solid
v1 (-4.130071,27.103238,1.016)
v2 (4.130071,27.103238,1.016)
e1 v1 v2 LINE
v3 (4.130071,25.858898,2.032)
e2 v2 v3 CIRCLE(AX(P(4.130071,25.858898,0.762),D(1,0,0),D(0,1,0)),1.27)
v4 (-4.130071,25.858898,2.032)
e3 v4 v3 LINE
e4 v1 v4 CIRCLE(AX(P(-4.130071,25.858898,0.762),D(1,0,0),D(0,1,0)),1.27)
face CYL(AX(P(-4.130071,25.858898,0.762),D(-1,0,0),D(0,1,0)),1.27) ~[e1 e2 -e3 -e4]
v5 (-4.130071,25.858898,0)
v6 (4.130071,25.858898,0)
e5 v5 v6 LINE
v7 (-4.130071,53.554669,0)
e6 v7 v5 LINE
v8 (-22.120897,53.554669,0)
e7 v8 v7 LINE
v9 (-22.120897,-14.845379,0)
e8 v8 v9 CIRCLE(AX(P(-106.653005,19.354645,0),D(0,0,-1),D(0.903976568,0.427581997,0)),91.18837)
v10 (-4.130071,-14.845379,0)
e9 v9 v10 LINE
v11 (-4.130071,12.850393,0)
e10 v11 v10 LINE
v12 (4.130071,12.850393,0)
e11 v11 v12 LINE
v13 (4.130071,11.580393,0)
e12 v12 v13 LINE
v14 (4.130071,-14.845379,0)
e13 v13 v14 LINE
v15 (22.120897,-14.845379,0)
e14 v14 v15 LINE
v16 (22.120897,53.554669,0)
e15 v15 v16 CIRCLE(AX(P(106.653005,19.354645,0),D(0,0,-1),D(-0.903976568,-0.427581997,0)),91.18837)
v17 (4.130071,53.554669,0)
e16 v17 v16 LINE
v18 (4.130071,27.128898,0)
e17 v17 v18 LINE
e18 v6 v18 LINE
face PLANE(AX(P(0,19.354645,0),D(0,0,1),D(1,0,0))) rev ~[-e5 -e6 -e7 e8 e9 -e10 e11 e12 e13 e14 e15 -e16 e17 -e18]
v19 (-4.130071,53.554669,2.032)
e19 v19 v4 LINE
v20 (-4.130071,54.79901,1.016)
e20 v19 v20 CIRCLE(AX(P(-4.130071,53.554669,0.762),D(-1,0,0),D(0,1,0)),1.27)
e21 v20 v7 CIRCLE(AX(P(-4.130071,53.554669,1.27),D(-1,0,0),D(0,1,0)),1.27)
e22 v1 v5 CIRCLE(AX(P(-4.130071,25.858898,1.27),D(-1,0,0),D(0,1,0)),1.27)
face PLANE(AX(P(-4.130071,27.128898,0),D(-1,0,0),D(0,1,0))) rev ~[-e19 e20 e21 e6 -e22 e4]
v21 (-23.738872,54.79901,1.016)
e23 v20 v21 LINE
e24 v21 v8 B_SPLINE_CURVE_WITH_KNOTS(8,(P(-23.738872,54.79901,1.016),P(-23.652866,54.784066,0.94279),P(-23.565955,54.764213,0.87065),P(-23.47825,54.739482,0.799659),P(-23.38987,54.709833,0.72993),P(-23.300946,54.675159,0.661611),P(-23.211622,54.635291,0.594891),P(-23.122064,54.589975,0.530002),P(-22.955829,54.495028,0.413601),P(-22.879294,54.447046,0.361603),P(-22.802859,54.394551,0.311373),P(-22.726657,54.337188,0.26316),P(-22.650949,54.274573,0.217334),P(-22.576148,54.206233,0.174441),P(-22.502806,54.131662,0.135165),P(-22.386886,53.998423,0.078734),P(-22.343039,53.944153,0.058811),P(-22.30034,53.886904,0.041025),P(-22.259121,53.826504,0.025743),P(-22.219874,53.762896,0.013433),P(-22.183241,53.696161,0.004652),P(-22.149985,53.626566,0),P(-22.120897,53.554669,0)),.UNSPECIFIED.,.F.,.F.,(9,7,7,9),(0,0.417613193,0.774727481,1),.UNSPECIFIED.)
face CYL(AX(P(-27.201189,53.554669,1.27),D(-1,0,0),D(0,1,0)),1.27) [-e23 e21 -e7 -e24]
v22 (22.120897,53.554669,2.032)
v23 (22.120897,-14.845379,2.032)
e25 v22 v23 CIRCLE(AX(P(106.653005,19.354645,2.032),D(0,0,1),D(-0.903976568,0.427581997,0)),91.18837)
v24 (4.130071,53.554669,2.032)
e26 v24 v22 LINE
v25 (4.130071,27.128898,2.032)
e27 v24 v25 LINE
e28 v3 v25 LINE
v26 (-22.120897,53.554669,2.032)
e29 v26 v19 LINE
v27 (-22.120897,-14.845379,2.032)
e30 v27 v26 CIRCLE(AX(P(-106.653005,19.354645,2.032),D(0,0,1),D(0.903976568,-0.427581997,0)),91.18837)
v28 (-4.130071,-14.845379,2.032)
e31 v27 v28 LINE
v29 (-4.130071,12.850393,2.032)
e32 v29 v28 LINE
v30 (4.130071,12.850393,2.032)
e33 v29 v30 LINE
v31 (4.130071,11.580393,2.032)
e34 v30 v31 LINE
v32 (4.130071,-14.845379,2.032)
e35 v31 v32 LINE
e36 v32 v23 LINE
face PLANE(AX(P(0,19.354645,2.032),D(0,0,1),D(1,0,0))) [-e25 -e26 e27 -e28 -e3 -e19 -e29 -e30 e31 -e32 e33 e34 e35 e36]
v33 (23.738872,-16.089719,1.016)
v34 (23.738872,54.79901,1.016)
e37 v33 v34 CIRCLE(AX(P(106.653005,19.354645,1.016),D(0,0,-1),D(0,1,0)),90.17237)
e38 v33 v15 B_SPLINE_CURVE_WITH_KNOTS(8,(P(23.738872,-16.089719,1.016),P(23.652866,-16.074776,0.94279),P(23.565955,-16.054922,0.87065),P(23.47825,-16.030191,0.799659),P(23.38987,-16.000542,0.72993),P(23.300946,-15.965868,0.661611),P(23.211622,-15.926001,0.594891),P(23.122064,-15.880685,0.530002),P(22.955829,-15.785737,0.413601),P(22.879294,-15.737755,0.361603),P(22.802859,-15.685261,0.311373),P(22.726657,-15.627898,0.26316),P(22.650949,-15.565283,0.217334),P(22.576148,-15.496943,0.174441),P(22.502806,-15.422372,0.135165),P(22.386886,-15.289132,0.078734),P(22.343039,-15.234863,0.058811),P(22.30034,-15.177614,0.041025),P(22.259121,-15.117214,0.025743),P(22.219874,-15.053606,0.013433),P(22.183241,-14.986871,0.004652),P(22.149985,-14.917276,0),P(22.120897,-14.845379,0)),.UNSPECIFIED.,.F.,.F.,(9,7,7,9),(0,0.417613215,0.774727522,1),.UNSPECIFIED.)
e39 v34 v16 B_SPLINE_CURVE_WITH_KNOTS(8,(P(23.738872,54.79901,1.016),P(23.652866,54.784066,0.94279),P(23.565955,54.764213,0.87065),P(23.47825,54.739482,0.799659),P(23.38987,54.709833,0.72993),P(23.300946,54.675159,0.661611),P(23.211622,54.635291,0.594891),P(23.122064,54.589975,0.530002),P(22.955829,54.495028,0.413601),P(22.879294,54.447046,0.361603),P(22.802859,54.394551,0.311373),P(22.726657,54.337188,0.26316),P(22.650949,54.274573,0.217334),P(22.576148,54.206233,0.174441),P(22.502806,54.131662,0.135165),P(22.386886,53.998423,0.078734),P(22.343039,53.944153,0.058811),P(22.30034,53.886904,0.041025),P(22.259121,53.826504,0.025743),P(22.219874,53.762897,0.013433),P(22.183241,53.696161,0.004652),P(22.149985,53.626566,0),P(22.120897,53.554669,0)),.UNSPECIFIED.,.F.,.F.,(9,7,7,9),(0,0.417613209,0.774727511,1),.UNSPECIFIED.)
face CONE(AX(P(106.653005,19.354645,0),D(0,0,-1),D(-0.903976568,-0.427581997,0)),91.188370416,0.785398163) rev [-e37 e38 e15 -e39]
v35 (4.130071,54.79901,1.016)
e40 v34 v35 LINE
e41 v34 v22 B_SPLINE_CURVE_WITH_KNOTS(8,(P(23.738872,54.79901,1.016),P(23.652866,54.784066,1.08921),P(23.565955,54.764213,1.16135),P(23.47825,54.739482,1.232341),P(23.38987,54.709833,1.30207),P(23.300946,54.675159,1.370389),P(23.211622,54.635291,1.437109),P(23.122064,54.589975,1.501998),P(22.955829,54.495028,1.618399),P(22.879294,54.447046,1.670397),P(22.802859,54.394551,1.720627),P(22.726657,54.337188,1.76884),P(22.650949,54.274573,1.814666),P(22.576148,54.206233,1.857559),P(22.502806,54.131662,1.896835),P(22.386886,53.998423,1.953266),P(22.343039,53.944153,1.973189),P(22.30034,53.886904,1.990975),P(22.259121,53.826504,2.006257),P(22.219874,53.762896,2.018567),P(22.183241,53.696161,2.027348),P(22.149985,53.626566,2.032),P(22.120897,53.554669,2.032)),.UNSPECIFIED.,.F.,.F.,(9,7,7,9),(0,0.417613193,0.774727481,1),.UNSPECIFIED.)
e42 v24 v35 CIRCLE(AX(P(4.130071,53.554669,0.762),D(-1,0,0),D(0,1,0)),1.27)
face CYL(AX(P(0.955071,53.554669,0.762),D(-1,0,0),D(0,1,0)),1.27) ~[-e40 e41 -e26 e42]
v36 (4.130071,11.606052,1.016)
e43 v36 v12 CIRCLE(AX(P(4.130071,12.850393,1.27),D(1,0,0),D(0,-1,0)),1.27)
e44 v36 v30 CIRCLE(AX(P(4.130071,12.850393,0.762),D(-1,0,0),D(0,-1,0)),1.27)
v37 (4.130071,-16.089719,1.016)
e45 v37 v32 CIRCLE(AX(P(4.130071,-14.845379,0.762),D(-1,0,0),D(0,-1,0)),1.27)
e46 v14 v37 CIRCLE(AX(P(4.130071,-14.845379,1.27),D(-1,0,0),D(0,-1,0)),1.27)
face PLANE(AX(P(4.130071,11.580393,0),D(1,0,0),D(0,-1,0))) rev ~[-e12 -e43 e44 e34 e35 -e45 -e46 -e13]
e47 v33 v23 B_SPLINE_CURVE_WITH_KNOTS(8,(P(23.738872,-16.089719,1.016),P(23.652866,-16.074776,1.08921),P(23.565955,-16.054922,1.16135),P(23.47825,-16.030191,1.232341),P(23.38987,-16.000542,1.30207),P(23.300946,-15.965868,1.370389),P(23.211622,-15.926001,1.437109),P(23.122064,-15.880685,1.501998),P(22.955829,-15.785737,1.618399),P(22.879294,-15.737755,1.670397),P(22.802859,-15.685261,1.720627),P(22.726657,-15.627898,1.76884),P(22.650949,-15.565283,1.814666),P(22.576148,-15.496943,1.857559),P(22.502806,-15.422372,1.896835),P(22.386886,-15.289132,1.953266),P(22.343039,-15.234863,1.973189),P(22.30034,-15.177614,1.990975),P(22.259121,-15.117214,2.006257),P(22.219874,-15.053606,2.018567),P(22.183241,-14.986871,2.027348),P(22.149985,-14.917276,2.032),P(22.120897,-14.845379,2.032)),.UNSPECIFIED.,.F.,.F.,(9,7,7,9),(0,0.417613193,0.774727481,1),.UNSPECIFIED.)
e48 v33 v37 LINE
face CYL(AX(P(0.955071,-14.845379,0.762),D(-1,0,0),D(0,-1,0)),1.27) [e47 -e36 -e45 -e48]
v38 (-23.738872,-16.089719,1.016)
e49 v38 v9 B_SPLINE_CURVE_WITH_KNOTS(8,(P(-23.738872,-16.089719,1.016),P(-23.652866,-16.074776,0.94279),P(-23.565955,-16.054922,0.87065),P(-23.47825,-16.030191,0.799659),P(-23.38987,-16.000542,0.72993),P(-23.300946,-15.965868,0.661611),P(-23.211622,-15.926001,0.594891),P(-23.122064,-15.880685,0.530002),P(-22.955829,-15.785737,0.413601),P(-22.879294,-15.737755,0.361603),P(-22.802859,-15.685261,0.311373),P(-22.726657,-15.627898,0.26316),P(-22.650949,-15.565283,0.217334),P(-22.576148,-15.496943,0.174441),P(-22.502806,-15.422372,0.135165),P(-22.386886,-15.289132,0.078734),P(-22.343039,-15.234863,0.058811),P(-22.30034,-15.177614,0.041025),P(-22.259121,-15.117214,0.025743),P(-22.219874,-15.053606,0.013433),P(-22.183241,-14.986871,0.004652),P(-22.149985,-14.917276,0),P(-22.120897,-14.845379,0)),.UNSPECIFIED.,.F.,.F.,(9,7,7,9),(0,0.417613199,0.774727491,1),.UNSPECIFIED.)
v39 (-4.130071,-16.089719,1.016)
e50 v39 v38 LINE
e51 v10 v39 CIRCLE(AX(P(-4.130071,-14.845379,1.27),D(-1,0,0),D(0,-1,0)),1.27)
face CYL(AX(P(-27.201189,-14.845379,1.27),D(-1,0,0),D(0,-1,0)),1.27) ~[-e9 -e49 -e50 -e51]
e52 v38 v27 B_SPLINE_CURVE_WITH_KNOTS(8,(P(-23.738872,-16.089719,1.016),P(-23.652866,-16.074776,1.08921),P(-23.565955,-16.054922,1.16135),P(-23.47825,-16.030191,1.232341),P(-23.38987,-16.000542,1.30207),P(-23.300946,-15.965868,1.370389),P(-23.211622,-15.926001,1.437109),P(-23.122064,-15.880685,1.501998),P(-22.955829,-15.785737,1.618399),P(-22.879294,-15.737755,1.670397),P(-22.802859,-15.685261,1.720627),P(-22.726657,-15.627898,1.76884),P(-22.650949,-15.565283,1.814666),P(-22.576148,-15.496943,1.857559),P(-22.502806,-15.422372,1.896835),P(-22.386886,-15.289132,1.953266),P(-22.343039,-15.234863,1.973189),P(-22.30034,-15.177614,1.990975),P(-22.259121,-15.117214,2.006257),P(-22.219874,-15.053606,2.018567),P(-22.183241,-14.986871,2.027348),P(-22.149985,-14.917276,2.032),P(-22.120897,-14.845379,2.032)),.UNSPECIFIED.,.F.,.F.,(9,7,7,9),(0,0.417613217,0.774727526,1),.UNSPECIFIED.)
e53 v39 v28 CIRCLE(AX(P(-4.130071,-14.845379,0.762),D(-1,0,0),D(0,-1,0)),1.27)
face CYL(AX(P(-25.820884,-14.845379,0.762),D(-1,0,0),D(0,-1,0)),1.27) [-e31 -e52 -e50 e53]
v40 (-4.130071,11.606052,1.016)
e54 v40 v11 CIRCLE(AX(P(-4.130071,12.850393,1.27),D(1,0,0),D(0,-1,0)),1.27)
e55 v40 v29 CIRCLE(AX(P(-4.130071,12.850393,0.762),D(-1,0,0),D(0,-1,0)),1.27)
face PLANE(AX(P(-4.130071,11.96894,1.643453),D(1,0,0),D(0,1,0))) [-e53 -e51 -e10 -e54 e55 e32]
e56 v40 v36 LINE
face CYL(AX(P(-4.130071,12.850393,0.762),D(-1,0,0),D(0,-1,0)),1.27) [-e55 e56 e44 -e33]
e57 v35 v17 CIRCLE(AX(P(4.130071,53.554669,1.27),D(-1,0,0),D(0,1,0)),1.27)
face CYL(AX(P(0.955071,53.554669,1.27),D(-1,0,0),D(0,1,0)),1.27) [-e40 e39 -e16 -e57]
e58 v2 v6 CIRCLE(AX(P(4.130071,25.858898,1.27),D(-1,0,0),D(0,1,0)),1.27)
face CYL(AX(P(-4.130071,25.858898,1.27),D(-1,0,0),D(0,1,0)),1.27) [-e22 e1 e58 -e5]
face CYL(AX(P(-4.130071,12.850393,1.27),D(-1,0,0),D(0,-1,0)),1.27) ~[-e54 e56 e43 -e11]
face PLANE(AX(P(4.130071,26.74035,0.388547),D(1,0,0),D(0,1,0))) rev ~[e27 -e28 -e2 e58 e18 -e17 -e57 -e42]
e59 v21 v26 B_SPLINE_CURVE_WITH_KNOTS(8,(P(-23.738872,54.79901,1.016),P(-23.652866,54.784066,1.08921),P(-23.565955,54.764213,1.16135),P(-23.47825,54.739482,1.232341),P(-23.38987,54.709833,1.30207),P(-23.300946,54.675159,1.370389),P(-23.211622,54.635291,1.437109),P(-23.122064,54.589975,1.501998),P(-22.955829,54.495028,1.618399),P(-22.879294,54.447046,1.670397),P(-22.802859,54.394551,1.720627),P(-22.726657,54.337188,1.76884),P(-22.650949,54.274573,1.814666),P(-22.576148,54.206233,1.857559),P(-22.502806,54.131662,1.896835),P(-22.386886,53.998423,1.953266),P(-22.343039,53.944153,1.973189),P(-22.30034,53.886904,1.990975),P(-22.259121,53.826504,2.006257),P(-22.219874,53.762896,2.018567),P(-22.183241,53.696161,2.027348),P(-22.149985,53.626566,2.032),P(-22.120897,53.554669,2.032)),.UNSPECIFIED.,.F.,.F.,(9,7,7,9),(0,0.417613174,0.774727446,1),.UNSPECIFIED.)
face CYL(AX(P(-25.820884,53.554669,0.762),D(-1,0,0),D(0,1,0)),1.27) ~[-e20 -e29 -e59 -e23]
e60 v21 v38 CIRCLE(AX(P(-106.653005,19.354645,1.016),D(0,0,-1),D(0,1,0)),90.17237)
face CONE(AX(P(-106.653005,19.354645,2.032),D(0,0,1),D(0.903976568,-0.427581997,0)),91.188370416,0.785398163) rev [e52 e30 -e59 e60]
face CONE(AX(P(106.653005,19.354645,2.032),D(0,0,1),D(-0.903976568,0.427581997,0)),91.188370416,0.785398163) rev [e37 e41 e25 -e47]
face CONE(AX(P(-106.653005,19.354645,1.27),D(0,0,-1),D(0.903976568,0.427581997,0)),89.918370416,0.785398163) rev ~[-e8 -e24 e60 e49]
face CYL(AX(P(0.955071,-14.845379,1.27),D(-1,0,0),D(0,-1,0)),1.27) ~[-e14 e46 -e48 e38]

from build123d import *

# Parameters (mm, degrees)
F1_DEPTH    = 2.032
F2_T2_ANGLE = 50.6284103455
F2_T4_ANGLE = 50.6284103455
F2_T6_ANGLE = 50.6284103455
F2_T8_ANGLE = 50.6284103455
F3_T1_DEPTH = 26.2461176682
F3_T3_DEPTH = 24.8658132399
F3_T5_DEPTH = 24.86581324
F3_T7_DEPTH = 26.2461176682
F3_T9_DEPTH = 8.2601420581


# Not quite as in the source:
# - a fillet or chamfer that OpenCascade refuses, or shapes differently, is made with other operations: its cross-section is extruded or revolved along the edge and cut away or added


with BuildPart() as f1:
    # F0 (on Top) → F1 (new body)
    with BuildSketch(Plane.XY):
        with BuildLine():
            Line((-4.1300710291, 54.8246689141), (-24.0261886972, 54.8246689141))
            ThreePointArc((-24.0261886972, 54.8246689141), (-18.5763848247, 37.4605098755), (-16.7346344691, 19.3546451628))
            ThreePointArc((-16.7346344691, 19.3546451628), (-18.5763848247, 1.2487804501), (-24.0261886972, -16.1153785884))
            Line((-24.0261886972, -16.1153785884), (-4.1300710291, -16.1153785884))
            Line((-4.1300710291, -16.1153785884), (-4.1300710291, 11.5803927183))
            Line((-4.1300710291, 11.5803927183), (4.1300710291, 11.5803927183))
            Line((4.1300710291, 11.5803927183), (4.1300710291, -16.1153785884))
            Line((4.1300710291, -16.1153785884), (24.0261886972, -16.1153785884))
            ThreePointArc((24.0261886972, -16.1153785884), (18.5763848247, 1.2487804501), (16.7346344691, 19.3546451628))
            ThreePointArc((16.7346344691, 19.3546451628), (18.5763848247, 37.4605098755), (24.0261886972, 54.8246689141))
            Line((24.0261886972, 54.8246689141), (4.1300710291, 54.8246689141))
            Line((4.1300710291, 54.8246689141), (4.1300710291, 27.1288976073))
            Line((4.1300710291, 27.1288976073), (-4.1300710291, 27.1288976073))
            Line((-4.1300710291, 27.1288976073), (-4.1300710291, 54.8246689141))
        make_face()
    extrude(amount=F1_DEPTH)

    # F2: chamfer of 1.27 on 4 edges, made by hand

    # F2_s1 → F2_t2 (revolve, cut)
    with BuildSketch(Plane(origin=(26.9800180079, 57.0400631379, 0), x_dir=(0, 0, 1), z_dir=(0.4275819968, 0.9039765683, 0))):
        Polygon((2.032, -3.0522508854), (0.762, -1.7822508854), (2.032, -1.7822508854), align=None)
    revolve(axis=Axis((106.6530048847, 19.3546451628, 2.032), (0, 0, 1)), revolution_arc=F2_T2_ANGLE, mode=Mode.SUBTRACT)

    # F2_s3 → F2_t4 (revolve, cut)
    with BuildSketch(Plane(origin=(12.017944167, -25.4078516136, 0), x_dir=(0, 0, 1), z_dir=(0.4275819968, -0.9039765683, 0))):
        Polygon((0, -13.499144765), (1.27, -14.769144765), (0, -14.769144765), align=None)
    revolve(axis=Axis((106.6530048847, 19.3546451628, 0), (0, 0, -1)), revolution_arc=F2_T4_ANGLE, mode=Mode.SUBTRACT)

    # F2_s5 → F2_t6 (revolve, cut)
    with BuildSketch(Plane(origin=(-12.017944167, -25.4078516136, 0), x_dir=(0, 0, 1), z_dir=(-0.4275819968, -0.9039765683, 0))):
        Polygon((2.032, 13.499144765), (0.762, 14.769144765), (2.032, 14.769144765), align=None)
    revolve(axis=Axis((-106.6530048847, 19.3546451628, 2.032), (0, 0, 1)), revolution_arc=F2_T6_ANGLE, mode=Mode.SUBTRACT)

    # F2_s7 → F2_t8 (revolve, cut)
    with BuildSketch(Plane(origin=(-26.9800180079, 57.0400631379, 0), x_dir=(0, 0, 1), z_dir=(-0.4275819968, 0.9039765683, 0))):
        Polygon((1.27, 1.7822508854), (0, 3.0522508854), (0, 1.7822508854), align=None)
    revolve(axis=Axis((-106.6530048847, 19.3546451628, 0), (0, 0, -1)), revolution_arc=F2_T8_ANGLE, mode=Mode.SUBTRACT)

    # F3: fillet of radius 1.27 on 12 edges, made by hand

    # F3_s2 → F3_t1 (cut)
    with BuildSketch(Plane.YZ.offset(-27.2011886972)):
        with BuildLine():
            ThreePointArc((54.8246689141, 1.27), (54.4526945262, 0.3719743879), (53.5546689141, 0))
            Line((53.5546689141, 0), (54.8246689141, 0))
            Line((54.8246689141, 0), (54.8246689141, 1.27))
        make_face()
        with BuildLine():
            ThreePointArc((-16.1153785884, 1.27), (-15.7434042005, 0.3719743879), (-14.8453785884, 0))
            Line((-14.8453785884, 0), (-16.1153785884, 0))
            Line((-16.1153785884, 0), (-16.1153785884, 1.27))
        make_face()
    extrude(amount=F3_T1_DEPTH, mode=Mode.SUBTRACT)

    # F3_s4 → F3_t3 (cut)
    with BuildSketch(Plane.YZ.offset(-25.820884269)):
        with BuildLine():
            ThreePointArc((54.8246689141, 0.762), (54.4526945262, 1.6600256121), (53.5546689141, 2.032))
            Line((53.5546689141, 2.032), (54.8246689141, 2.032))
            Line((54.8246689141, 2.032), (54.8246689141, 0.762))
        make_face()
        with BuildLine():
            ThreePointArc((-16.1153785884, 0.762), (-15.7434042005, 1.6600256121), (-14.8453785884, 2.032))
            Line((-14.8453785884, 2.032), (-16.1153785884, 2.032))
            Line((-16.1153785884, 2.032), (-16.1153785884, 0.762))
        make_face()
    extrude(amount=F3_T3_DEPTH, mode=Mode.SUBTRACT)

    # F3_s6 → F3_t5 (cut)
    with BuildSketch(Plane.YZ.offset(0.9550710291)):
        with BuildLine():
            ThreePointArc((54.8246689141, 0.762), (54.4526945262, 1.6600256121), (53.5546689141, 2.032))
            Line((53.5546689141, 2.032), (54.8246689141, 2.032))
            Line((54.8246689141, 2.032), (54.8246689141, 0.762))
        make_face()
        with BuildLine():
            ThreePointArc((-16.1153785884, 0.762), (-15.7434042005, 1.6600256121), (-14.8453785884, 2.032))
            Line((-14.8453785884, 2.032), (-16.1153785884, 2.032))
            Line((-16.1153785884, 2.032), (-16.1153785884, 0.762))
        make_face()
    extrude(amount=F3_T5_DEPTH, mode=Mode.SUBTRACT)

    # F3_s8 → F3_t7 (cut)
    with BuildSketch(Plane.YZ.offset(0.9550710291)):
        with BuildLine():
            ThreePointArc((54.8246689141, 1.27), (54.4526945262, 0.3719743879), (53.5546689141, 0))
            Line((53.5546689141, 0), (54.8246689141, 0))
            Line((54.8246689141, 0), (54.8246689141, 1.27))
        make_face()
        with BuildLine():
            ThreePointArc((-16.1153785884, 1.27), (-15.7434042005, 0.3719743879), (-14.8453785884, 0))
            Line((-14.8453785884, 0), (-16.1153785884, 0))
            Line((-16.1153785884, 0), (-16.1153785884, 1.27))
        make_face()
    extrude(amount=F3_T7_DEPTH, mode=Mode.SUBTRACT)

    # F3_s10 → F3_t9 (cut)
    with BuildSketch(Plane.YZ.offset(-4.1300710291)):
        with BuildLine():
            ThreePointArc((11.5803927183, 0.762), (11.9523671062, 1.6600256121), (12.8503927183, 2.032))
            Line((12.8503927183, 2.032), (11.5803927183, 2.032))
            Line((11.5803927183, 2.032), (11.5803927183, 0.762))
        make_face()
        with BuildLine():
            ThreePointArc((11.5803927183, 1.27), (11.9523671062, 0.3719743879), (12.8503927183, 0))
            Line((12.8503927183, 0), (11.5803927183, 0))
            Line((11.5803927183, 0), (11.5803927183, 1.27))
        make_face()
        with BuildLine():
            ThreePointArc((27.1288976073, 1.27), (26.7569232194, 0.3719743879), (25.8588976073, 0))
            Line((25.8588976073, 0), (27.1288976073, 0))
            Line((27.1288976073, 0), (27.1288976073, 1.27))
        make_face()
        with BuildLine():
            ThreePointArc((27.1288976073, 0.762), (26.7569232194, 1.6600256121), (25.8588976073, 2.032))
            Line((25.8588976073, 2.032), (27.1288976073, 2.032))
            Line((27.1288976073, 2.032), (27.1288976073, 0.762))
        make_face()
    extrude(amount=F3_T9_DEPTH, mode=Mode.SUBTRACT)


solid = f1.part
